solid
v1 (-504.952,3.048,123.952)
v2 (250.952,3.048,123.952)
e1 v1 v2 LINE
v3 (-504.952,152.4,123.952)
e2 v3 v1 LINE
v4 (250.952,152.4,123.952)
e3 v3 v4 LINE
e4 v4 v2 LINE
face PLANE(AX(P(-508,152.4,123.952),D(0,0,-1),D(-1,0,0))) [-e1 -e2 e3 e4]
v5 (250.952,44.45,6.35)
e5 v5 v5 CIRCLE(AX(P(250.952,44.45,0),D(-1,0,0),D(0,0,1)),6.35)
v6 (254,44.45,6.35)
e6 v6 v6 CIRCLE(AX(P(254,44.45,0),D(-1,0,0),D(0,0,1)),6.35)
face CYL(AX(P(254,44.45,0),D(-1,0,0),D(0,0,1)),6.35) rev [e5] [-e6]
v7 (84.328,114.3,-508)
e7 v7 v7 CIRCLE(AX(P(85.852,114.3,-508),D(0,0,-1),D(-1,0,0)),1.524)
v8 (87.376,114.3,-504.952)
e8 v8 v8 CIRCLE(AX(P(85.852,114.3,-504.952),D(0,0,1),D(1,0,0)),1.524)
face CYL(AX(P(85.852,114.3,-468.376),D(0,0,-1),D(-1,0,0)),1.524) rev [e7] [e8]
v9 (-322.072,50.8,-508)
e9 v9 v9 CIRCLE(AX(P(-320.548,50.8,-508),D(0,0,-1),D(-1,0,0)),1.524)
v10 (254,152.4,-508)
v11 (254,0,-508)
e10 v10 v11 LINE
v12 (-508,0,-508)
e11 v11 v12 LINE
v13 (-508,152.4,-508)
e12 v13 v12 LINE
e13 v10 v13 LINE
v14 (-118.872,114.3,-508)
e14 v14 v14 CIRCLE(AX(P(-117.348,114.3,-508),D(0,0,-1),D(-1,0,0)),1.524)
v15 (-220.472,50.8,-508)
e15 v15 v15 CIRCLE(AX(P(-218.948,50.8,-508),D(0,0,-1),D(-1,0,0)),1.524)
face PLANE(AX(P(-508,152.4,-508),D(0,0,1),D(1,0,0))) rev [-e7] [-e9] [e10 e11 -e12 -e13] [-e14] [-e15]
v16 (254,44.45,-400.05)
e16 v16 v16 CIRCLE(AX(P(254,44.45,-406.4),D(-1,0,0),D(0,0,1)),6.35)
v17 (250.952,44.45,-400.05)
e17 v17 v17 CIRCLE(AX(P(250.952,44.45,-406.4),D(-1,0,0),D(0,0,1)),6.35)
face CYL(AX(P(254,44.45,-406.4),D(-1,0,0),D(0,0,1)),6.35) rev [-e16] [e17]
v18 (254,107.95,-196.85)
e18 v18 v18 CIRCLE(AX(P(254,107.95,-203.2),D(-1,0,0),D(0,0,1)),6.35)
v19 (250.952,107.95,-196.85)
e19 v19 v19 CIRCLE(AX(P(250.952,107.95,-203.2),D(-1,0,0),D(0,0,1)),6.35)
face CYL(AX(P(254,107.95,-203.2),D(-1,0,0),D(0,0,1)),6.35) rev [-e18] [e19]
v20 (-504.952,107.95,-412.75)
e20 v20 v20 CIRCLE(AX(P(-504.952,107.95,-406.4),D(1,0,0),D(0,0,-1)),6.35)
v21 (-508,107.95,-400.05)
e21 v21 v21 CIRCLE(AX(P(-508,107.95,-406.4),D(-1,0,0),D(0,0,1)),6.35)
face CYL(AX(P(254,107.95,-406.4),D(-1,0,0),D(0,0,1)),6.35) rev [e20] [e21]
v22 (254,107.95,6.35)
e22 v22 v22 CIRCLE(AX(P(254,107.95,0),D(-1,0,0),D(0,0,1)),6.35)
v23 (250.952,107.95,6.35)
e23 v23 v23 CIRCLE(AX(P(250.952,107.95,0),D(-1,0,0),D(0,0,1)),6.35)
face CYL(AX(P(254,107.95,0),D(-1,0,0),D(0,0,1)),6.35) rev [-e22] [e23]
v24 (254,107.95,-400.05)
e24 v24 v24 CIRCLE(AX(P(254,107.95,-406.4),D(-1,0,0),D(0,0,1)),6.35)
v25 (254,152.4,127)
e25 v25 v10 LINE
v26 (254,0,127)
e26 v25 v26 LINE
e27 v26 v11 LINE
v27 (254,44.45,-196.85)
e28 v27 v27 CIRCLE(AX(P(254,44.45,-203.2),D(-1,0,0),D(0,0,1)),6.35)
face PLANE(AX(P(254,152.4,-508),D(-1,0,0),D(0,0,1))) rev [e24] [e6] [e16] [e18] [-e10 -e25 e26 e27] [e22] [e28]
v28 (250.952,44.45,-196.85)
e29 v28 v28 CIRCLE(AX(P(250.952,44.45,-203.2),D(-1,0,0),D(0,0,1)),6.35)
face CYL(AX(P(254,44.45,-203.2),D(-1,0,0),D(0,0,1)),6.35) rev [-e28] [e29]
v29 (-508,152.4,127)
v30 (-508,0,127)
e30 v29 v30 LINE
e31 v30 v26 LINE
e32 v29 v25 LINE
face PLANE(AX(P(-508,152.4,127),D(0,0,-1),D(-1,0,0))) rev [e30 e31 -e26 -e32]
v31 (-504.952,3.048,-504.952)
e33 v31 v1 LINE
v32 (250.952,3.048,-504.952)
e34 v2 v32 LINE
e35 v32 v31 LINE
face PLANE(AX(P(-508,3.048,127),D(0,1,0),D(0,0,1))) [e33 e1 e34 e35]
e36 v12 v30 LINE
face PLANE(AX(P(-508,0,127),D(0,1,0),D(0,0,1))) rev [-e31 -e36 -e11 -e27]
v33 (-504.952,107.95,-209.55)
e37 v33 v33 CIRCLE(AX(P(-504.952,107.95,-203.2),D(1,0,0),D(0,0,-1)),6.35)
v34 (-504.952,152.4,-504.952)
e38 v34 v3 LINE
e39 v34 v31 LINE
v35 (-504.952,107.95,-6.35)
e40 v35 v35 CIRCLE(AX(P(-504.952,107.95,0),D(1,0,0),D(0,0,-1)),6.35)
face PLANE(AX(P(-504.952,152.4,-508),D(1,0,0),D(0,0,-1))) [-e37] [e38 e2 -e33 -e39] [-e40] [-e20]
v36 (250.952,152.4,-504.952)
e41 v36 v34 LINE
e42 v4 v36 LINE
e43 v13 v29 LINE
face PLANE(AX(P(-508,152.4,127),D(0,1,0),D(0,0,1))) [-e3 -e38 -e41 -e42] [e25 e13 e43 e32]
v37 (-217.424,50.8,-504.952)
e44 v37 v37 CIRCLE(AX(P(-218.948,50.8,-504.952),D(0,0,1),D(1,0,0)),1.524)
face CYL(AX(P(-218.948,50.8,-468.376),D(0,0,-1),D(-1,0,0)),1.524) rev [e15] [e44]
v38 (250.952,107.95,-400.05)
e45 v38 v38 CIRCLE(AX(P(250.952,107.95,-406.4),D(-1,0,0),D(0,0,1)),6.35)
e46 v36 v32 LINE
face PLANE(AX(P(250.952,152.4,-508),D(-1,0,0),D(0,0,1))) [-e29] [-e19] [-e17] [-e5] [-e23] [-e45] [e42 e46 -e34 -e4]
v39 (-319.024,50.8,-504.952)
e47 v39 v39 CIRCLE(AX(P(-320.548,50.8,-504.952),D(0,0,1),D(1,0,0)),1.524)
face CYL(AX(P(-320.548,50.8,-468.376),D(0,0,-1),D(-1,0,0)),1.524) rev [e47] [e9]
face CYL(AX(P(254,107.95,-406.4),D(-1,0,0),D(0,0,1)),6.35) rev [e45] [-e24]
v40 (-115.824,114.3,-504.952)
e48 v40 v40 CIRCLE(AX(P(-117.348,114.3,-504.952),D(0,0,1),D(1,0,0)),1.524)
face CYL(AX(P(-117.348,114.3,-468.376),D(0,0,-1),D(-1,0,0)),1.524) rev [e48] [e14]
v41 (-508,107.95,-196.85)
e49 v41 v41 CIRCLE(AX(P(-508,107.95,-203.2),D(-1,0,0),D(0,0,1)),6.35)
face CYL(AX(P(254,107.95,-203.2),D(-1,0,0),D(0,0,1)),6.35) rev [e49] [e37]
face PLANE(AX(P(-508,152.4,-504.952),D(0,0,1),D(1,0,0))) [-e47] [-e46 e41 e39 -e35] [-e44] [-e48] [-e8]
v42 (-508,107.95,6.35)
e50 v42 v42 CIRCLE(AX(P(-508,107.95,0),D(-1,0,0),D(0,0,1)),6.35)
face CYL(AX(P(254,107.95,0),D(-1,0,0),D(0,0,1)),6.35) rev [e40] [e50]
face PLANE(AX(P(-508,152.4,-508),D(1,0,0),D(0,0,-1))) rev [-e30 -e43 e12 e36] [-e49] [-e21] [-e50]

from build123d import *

# Parameters (mm, degrees)
SKETCH1_W                          = 762
SKETCH1_H                          = 635
EXTRUDE1_DEPTH                     = 152.4
SHELL1_T                           = -3.048
SKETCH2_R                          = 6.35
CONNECTOR_MOUNT_CUT_EXTRUDE1_DEPTH = 929.403877631
LPATTERN1_START                    = -508
LPATTERN1_OUTLINE_R                = 6.35
LPATTERN1_DEPTH                    = 3.048
LPATTERN5_START                    = 250.952
LPATTERN5_OUTLINE_R                = 6.35
LPATTERN5_DEPTH                    = 3.048
SKETCH3_R                          = 1.524
CLIP_MOUNT_CUT_EXTRUDE2_DEPTH      = 39.624
LPATTERN2_COUNT                    = 5
LPATTERN2_PITCH                    = 101.6
LPATTERN2_COUNT_DIR2               = 2
LPATTERN2_PITCH_DIR2               = 63.5


# Read off the part's stored shape, not the designer's step: LPattern1, LPattern5
with BuildPart() as part:
    # Sketch1 → Extrude1 (new body)
    with BuildSketch(Plane(origin=(0, 0, 0), x_dir=(1, 0, 0), z_dir=(0, 1, 0))):
        with Locations((-127, 190.5)):
            Rectangle(SKETCH1_W, SKETCH1_H)
    extrude(amount=EXTRUDE1_DEPTH)

    # Shell1
    shell1_openings = [part.faces().sort_by_distance(p)[0] for p in [
        (-127, 152.4, -190.5),
    ]]
    offset(amount=SHELL1_T, openings=shell1_openings, kind=Kind.INTERSECTION)

    # Sketch2 → Connector mount--Cut-Extrude1 (cut, through all)
    with BuildSketch(Plane.ZY.offset(508)):
        with Locations((-406.4, 107.95)):
            Circle(SKETCH2_R)
    extrude(amount=-CONNECTOR_MOUNT_CUT_EXTRUDE1_DEPTH, mode=Mode.SUBTRACT)

    # LPattern1 outline → LPattern1 (cut)
    with BuildSketch(Plane.YZ.offset(LPATTERN1_START)):
        with Locations((107.95, 0)):
            Circle(LPATTERN1_OUTLINE_R)
        with Locations((107.95, -203.2)):
            Circle(LPATTERN1_OUTLINE_R)
    extrude(amount=LPATTERN1_DEPTH, mode=Mode.SUBTRACT)

    # LPattern5 outline → LPattern5 (cut)
    with BuildSketch(Plane.YZ.offset(LPATTERN5_START)):
        with Locations((44.45, 0)):
            Circle(LPATTERN5_OUTLINE_R)
        with Locations((44.45, -203.2)):
            Circle(LPATTERN5_OUTLINE_R)
        with Locations((44.45, -406.4)):
            Circle(LPATTERN5_OUTLINE_R)
        with Locations((107.95, 0)):
            Circle(LPATTERN5_OUTLINE_R)
        with Locations((107.95, -203.2)):
            Circle(LPATTERN5_OUTLINE_R)
    extrude(amount=LPATTERN5_DEPTH, mode=Mode.SUBTRACT)

    # Sketch3 → Clip Mount --Cut-Extrude2 (cut)
    with BuildSketch(Plane(origin=(0, 0, -508), x_dir=(-1, 0, 0), z_dir=(0, 0, -1))):
        with Locations((-85.852, 114.3)):
            Circle(SKETCH3_R)
    clip_mount_cut_extrude2 = extrude(amount=-CLIP_MOUNT_CUT_EXTRUDE2_DEPTH, mode=Mode.SUBTRACT)

    # LPattern2: Clip Mount --Cut-Extrude2 5 × 2, 6 skipped
    with Locations(*[(-i * LPATTERN2_PITCH, -j * LPATTERN2_PITCH_DIR2, 0) for i in range(LPATTERN2_COUNT) for j in range(LPATTERN2_COUNT_DIR2) if (i, j) not in ((0, 0), (0, 1), (1, 0), (1, 1), (2, 1), (3, 0), (4, 0))]):
        add(clip_mount_cut_extrude2, mode=Mode.SUBTRACT)


solid = part.part
